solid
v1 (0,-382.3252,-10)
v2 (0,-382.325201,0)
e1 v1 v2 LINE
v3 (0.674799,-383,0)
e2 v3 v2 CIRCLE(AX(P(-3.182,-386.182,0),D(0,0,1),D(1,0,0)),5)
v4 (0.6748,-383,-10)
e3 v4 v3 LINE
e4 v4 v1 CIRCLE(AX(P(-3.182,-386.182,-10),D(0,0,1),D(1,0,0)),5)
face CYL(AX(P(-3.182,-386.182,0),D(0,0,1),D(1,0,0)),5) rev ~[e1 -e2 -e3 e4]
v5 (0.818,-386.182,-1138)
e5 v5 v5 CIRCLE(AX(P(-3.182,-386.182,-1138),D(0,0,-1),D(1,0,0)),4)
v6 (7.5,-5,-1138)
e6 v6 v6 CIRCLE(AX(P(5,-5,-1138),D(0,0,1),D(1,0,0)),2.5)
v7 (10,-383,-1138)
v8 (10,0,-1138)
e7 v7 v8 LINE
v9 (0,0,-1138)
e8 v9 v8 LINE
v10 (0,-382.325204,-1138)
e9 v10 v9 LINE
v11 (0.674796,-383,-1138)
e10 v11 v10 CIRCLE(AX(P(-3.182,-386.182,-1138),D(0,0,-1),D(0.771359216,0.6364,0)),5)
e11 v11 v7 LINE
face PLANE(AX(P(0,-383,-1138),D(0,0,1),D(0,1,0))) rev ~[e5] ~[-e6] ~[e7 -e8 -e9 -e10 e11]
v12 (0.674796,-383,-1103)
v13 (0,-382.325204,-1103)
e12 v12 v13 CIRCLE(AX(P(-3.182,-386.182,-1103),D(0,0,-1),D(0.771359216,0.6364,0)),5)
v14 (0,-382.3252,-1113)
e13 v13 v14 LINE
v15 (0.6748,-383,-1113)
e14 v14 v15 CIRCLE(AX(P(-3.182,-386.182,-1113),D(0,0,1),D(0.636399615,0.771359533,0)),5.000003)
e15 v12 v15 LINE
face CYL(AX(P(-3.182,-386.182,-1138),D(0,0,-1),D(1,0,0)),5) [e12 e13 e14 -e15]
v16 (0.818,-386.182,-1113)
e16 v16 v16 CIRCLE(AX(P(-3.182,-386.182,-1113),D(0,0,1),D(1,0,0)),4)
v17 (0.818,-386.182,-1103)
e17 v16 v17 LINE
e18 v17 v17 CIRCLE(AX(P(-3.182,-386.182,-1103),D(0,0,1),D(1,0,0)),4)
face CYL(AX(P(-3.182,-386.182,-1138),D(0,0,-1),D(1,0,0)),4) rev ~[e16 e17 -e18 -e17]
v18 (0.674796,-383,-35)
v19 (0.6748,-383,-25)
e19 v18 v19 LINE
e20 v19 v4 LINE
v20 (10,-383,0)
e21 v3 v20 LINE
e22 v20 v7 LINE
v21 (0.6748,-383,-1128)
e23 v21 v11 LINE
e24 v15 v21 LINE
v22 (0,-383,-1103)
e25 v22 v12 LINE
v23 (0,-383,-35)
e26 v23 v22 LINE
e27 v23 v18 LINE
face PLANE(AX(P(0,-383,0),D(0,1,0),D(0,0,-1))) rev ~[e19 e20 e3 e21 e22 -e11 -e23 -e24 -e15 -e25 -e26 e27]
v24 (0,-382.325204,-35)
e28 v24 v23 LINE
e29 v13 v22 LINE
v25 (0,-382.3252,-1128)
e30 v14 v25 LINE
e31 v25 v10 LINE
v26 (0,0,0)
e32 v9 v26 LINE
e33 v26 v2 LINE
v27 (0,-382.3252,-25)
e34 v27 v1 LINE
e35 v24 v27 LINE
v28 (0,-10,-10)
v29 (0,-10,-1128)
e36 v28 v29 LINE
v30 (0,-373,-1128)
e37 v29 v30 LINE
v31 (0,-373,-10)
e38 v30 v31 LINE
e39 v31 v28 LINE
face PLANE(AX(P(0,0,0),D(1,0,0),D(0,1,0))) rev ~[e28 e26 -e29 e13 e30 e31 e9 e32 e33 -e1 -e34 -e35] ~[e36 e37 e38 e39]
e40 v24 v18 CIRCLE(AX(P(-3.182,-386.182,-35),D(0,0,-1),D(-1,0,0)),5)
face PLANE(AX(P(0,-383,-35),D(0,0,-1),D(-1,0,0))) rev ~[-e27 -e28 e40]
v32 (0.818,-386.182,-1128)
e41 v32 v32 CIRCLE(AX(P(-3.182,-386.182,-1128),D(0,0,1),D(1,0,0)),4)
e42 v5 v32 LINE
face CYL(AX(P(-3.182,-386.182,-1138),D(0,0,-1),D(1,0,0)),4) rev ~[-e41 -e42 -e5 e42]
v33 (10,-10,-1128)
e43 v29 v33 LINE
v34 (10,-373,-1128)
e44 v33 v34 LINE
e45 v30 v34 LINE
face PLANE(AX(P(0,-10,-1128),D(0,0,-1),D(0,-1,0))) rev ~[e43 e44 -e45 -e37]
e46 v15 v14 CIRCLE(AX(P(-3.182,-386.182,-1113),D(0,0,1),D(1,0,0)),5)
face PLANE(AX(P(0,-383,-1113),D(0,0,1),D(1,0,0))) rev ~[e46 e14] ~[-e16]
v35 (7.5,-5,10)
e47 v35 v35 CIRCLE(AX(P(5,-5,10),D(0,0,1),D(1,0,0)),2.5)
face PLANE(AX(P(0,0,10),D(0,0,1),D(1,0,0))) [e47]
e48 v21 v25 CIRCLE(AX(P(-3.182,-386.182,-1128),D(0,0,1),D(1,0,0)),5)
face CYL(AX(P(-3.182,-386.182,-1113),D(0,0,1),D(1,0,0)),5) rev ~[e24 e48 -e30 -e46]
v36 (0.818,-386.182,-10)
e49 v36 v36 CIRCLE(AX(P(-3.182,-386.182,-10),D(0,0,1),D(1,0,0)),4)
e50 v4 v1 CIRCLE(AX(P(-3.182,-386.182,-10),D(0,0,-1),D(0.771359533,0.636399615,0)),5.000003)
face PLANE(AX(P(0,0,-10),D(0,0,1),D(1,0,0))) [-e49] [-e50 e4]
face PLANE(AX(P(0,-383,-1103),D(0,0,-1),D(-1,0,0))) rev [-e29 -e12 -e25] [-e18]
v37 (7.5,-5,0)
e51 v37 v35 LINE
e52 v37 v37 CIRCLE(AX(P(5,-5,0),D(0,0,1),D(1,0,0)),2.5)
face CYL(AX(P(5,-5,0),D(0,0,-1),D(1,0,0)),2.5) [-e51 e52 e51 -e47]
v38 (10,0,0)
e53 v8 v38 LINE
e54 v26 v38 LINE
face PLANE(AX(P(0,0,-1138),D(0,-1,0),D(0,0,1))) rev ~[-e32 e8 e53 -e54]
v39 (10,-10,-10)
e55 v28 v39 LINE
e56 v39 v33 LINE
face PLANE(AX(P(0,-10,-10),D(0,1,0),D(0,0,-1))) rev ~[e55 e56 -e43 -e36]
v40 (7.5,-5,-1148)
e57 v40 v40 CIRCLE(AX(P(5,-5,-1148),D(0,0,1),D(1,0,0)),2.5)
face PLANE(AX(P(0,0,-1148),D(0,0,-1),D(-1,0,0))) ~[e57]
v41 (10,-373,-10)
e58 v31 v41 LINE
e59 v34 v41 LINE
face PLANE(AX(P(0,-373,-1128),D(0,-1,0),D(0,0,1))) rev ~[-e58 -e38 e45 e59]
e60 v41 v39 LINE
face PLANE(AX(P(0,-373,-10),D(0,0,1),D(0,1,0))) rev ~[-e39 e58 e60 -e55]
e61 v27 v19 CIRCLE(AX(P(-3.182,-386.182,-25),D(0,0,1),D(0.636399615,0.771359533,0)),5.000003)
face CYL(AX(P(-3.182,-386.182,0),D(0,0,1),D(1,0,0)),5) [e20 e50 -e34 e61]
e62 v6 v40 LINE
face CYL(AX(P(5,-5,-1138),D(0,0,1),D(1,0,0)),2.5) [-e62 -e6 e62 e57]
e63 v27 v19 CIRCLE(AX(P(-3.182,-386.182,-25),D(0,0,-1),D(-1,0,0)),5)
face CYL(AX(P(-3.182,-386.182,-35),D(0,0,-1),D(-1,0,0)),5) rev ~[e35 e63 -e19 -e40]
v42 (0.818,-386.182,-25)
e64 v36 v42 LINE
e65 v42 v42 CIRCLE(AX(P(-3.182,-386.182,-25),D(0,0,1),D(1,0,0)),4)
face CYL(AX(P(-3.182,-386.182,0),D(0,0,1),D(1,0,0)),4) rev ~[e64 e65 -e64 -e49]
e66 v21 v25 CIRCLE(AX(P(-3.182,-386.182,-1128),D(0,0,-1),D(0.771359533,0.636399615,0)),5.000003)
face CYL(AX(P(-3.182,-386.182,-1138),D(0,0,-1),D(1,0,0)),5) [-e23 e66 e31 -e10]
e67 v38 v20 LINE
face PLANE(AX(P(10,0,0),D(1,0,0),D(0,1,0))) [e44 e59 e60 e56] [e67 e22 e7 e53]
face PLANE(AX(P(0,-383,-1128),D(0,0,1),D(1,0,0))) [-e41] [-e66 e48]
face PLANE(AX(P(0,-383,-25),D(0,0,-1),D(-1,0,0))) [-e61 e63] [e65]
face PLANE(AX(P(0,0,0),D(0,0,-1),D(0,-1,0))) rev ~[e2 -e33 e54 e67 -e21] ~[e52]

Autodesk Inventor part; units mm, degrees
ref_plane "YZ Plane" through (0, 0, 0) normal (1, 0, 0) x (0, 1, 0)
ref_plane "XZ Plane" through (0, 0, 0) normal (0, 1, 0) x (-1, 0, 0)
ref_plane "XY Plane" through (0, 0, 0) normal (0, 0, 1) x (1, 0, 0)
sketch "Sketch1" plane through (0, 0, 0) normal (1, 0, 0) x (0, 1, 0)
  line L0 (0, 0) -> (-383, 0)
  line L1 (-383, 0) -> (-383, -1138)
  line L2 (-383, -1138) -> (0, -1138)
  line L3 (0, -1138) -> (0, 0)
  line L4 (-373, -1128) -> (-373, -10)
  line L5 (-373, -10) -> (-10, -10)
  line L6 (-10, -10) -> (-10, -1128)
  line L7 (-10, -1128) -> (-373, -1128)
  dimension "d0" = 383
  dimension "portaAltura" = 1138
  dimension "d2" = 10
  dimension "portaLargura" = 363
extrude "Extrusion1" add sketch "Sketch1" along normal blind 10
sketch "Sketch2" plane through (0, -383, 0) normal (0, 0, 1) x (1, 0, 0)
  line L0 (0, 383) -> (0, 0) projected
  line L1 (0, 0) -> (10, 0) projected
  line L2 (10, 383) -> (10, 0) projected
  line L3 (0, 383) -> (10, 383) projected
  line L4 (0, 0) -> (-3.182, -3.182)
  line L5 (0, 0) -> (4.5, 0) construction
  line L6 (0, 383) -> (0, 0) projected
  circle A0 centre (-3.182, -3.182) radius 5
  circle A1 centre (-3.182, -3.182) radius 4
  dimension "d5" = 4.5
  dimension "d6" = 135
  dimension "d7" = 1
  dimension "d10" = 10
extrude "Extrusion2" add sketch "Sketch2" against normal blind 35 contours A0 L1 L0 | L0 L1 A0
ref_plane "Work Plane1" through (0, 0, -569) normal (0, 0, 1) x (1, 0, 0)
mirror "Mirror1" about plane through (0, 0, -569) normal (0, 0, 1) of "Extrusion2"
fillet "Fillet1" [suppressed]
ref_plane "Work Plane2" through (0, -383, -1113) normal (0, 0, 1) x (1, 0, 0)
sketch "Sketch3" plane through (0, -383, -1113) normal (0, 0, 1) x (1, 0, 0)
  arc A0 (0, 0.6748) -> (0.6748, 0) centre (-3.182, -3.182) ccw projected
  circle A1 centre (-3.182, -3.182) radius 4 projected
  line L0 (0.6748, 0) -> (10, 0) projected
  circle A2 centre (-3.182, -3.182) radius 5
  point P0 (0, 383)
  point P1 (0, 0.6748)
extrude "Extrusion3" cut sketch "Sketch3" against normal blind 15
sketch "Sketch4" plane through (0, 0, 0) normal (0, 0, 1) x (1, 0, 0)
  circle A0 centre (-3.182, -386.182) radius 4 projected
  arc A1 (0, -382.3252) -> (0.6748, -383) centre (-3.182, -386.182) ccw projected
  circle A2 centre (-3.182, -386.182) radius 4 projected
  line L0 (0.6748, -383) -> (10, -383) projected
  circle A3 centre (-3.182, -386.182) radius 5
  point P0 (0, 0)
  point P1 (0, -382.3252)
extrude "Extrusion4" cut sketch "Sketch4" against normal blind 10
sketch "Sketch5" plane through (0, -383, -35) normal (0, 0, -1) x (-1, 0, 0)
  circle A0 centre (3.182, -3.182) radius 4 projected
  arc A1 (-0.6748, 0) -> (0, 0.6748) centre (3.182, -3.182) ccw projected
  circle A2 centre (3.182, -3.182) radius 5
  point P0 (0, 383)
  point P1 (0, 0.6748)
extrude "Extrusion5" cut sketch "Sketch5" against normal blind 10
sketch "Sketch6" plane through (0, 0, 0) normal (0, 0, 1) x (1, 0, 0)
  arc A0 (0.6748, -383) -> (0, -382.3252) centre (-3.182, -386.182) ccw projected
  line L0 (0.6748, -383) -> (10, -383) projected
  line L1 (10, 0) -> (10, -383) projected
  line L2 (0, 0) -> (10, 0) projected
  line L3 (0, 0) -> (0, -382.3252) projected
  line L4 (10, -383) -> (10, 0) construction
  line L5 (0, -10) -> (10, -10) construction
  line L6 (10, 0) -> (0, -10) construction
  line L7 (0, 0) -> (10, 0) construction
  line L8 (0, 0) -> (10, -10) construction
  circle A1 centre (5, -5) radius 2.5
  dimension "d19" = 5
extrude "Extrusion6" add sketch "Sketch6" along normal blind 10 contours A1
sketch "Sketch7" plane through (5, -5, 10) normal (0, 0, 1) x (1, 0, 0)
  circle A0 centre (0, 0) radius 2.5 projected
  circle A1 centre (0, 0) radius 5
  point P0 (-5, 5)
  dimension "d22" = 10
extrude "Extrusion7" [suppressed]
mirror "Mirror2" about plane through (0, 0, -569) normal (0, 0, 1) of "Extrusion6"
properties part number "porta1"
